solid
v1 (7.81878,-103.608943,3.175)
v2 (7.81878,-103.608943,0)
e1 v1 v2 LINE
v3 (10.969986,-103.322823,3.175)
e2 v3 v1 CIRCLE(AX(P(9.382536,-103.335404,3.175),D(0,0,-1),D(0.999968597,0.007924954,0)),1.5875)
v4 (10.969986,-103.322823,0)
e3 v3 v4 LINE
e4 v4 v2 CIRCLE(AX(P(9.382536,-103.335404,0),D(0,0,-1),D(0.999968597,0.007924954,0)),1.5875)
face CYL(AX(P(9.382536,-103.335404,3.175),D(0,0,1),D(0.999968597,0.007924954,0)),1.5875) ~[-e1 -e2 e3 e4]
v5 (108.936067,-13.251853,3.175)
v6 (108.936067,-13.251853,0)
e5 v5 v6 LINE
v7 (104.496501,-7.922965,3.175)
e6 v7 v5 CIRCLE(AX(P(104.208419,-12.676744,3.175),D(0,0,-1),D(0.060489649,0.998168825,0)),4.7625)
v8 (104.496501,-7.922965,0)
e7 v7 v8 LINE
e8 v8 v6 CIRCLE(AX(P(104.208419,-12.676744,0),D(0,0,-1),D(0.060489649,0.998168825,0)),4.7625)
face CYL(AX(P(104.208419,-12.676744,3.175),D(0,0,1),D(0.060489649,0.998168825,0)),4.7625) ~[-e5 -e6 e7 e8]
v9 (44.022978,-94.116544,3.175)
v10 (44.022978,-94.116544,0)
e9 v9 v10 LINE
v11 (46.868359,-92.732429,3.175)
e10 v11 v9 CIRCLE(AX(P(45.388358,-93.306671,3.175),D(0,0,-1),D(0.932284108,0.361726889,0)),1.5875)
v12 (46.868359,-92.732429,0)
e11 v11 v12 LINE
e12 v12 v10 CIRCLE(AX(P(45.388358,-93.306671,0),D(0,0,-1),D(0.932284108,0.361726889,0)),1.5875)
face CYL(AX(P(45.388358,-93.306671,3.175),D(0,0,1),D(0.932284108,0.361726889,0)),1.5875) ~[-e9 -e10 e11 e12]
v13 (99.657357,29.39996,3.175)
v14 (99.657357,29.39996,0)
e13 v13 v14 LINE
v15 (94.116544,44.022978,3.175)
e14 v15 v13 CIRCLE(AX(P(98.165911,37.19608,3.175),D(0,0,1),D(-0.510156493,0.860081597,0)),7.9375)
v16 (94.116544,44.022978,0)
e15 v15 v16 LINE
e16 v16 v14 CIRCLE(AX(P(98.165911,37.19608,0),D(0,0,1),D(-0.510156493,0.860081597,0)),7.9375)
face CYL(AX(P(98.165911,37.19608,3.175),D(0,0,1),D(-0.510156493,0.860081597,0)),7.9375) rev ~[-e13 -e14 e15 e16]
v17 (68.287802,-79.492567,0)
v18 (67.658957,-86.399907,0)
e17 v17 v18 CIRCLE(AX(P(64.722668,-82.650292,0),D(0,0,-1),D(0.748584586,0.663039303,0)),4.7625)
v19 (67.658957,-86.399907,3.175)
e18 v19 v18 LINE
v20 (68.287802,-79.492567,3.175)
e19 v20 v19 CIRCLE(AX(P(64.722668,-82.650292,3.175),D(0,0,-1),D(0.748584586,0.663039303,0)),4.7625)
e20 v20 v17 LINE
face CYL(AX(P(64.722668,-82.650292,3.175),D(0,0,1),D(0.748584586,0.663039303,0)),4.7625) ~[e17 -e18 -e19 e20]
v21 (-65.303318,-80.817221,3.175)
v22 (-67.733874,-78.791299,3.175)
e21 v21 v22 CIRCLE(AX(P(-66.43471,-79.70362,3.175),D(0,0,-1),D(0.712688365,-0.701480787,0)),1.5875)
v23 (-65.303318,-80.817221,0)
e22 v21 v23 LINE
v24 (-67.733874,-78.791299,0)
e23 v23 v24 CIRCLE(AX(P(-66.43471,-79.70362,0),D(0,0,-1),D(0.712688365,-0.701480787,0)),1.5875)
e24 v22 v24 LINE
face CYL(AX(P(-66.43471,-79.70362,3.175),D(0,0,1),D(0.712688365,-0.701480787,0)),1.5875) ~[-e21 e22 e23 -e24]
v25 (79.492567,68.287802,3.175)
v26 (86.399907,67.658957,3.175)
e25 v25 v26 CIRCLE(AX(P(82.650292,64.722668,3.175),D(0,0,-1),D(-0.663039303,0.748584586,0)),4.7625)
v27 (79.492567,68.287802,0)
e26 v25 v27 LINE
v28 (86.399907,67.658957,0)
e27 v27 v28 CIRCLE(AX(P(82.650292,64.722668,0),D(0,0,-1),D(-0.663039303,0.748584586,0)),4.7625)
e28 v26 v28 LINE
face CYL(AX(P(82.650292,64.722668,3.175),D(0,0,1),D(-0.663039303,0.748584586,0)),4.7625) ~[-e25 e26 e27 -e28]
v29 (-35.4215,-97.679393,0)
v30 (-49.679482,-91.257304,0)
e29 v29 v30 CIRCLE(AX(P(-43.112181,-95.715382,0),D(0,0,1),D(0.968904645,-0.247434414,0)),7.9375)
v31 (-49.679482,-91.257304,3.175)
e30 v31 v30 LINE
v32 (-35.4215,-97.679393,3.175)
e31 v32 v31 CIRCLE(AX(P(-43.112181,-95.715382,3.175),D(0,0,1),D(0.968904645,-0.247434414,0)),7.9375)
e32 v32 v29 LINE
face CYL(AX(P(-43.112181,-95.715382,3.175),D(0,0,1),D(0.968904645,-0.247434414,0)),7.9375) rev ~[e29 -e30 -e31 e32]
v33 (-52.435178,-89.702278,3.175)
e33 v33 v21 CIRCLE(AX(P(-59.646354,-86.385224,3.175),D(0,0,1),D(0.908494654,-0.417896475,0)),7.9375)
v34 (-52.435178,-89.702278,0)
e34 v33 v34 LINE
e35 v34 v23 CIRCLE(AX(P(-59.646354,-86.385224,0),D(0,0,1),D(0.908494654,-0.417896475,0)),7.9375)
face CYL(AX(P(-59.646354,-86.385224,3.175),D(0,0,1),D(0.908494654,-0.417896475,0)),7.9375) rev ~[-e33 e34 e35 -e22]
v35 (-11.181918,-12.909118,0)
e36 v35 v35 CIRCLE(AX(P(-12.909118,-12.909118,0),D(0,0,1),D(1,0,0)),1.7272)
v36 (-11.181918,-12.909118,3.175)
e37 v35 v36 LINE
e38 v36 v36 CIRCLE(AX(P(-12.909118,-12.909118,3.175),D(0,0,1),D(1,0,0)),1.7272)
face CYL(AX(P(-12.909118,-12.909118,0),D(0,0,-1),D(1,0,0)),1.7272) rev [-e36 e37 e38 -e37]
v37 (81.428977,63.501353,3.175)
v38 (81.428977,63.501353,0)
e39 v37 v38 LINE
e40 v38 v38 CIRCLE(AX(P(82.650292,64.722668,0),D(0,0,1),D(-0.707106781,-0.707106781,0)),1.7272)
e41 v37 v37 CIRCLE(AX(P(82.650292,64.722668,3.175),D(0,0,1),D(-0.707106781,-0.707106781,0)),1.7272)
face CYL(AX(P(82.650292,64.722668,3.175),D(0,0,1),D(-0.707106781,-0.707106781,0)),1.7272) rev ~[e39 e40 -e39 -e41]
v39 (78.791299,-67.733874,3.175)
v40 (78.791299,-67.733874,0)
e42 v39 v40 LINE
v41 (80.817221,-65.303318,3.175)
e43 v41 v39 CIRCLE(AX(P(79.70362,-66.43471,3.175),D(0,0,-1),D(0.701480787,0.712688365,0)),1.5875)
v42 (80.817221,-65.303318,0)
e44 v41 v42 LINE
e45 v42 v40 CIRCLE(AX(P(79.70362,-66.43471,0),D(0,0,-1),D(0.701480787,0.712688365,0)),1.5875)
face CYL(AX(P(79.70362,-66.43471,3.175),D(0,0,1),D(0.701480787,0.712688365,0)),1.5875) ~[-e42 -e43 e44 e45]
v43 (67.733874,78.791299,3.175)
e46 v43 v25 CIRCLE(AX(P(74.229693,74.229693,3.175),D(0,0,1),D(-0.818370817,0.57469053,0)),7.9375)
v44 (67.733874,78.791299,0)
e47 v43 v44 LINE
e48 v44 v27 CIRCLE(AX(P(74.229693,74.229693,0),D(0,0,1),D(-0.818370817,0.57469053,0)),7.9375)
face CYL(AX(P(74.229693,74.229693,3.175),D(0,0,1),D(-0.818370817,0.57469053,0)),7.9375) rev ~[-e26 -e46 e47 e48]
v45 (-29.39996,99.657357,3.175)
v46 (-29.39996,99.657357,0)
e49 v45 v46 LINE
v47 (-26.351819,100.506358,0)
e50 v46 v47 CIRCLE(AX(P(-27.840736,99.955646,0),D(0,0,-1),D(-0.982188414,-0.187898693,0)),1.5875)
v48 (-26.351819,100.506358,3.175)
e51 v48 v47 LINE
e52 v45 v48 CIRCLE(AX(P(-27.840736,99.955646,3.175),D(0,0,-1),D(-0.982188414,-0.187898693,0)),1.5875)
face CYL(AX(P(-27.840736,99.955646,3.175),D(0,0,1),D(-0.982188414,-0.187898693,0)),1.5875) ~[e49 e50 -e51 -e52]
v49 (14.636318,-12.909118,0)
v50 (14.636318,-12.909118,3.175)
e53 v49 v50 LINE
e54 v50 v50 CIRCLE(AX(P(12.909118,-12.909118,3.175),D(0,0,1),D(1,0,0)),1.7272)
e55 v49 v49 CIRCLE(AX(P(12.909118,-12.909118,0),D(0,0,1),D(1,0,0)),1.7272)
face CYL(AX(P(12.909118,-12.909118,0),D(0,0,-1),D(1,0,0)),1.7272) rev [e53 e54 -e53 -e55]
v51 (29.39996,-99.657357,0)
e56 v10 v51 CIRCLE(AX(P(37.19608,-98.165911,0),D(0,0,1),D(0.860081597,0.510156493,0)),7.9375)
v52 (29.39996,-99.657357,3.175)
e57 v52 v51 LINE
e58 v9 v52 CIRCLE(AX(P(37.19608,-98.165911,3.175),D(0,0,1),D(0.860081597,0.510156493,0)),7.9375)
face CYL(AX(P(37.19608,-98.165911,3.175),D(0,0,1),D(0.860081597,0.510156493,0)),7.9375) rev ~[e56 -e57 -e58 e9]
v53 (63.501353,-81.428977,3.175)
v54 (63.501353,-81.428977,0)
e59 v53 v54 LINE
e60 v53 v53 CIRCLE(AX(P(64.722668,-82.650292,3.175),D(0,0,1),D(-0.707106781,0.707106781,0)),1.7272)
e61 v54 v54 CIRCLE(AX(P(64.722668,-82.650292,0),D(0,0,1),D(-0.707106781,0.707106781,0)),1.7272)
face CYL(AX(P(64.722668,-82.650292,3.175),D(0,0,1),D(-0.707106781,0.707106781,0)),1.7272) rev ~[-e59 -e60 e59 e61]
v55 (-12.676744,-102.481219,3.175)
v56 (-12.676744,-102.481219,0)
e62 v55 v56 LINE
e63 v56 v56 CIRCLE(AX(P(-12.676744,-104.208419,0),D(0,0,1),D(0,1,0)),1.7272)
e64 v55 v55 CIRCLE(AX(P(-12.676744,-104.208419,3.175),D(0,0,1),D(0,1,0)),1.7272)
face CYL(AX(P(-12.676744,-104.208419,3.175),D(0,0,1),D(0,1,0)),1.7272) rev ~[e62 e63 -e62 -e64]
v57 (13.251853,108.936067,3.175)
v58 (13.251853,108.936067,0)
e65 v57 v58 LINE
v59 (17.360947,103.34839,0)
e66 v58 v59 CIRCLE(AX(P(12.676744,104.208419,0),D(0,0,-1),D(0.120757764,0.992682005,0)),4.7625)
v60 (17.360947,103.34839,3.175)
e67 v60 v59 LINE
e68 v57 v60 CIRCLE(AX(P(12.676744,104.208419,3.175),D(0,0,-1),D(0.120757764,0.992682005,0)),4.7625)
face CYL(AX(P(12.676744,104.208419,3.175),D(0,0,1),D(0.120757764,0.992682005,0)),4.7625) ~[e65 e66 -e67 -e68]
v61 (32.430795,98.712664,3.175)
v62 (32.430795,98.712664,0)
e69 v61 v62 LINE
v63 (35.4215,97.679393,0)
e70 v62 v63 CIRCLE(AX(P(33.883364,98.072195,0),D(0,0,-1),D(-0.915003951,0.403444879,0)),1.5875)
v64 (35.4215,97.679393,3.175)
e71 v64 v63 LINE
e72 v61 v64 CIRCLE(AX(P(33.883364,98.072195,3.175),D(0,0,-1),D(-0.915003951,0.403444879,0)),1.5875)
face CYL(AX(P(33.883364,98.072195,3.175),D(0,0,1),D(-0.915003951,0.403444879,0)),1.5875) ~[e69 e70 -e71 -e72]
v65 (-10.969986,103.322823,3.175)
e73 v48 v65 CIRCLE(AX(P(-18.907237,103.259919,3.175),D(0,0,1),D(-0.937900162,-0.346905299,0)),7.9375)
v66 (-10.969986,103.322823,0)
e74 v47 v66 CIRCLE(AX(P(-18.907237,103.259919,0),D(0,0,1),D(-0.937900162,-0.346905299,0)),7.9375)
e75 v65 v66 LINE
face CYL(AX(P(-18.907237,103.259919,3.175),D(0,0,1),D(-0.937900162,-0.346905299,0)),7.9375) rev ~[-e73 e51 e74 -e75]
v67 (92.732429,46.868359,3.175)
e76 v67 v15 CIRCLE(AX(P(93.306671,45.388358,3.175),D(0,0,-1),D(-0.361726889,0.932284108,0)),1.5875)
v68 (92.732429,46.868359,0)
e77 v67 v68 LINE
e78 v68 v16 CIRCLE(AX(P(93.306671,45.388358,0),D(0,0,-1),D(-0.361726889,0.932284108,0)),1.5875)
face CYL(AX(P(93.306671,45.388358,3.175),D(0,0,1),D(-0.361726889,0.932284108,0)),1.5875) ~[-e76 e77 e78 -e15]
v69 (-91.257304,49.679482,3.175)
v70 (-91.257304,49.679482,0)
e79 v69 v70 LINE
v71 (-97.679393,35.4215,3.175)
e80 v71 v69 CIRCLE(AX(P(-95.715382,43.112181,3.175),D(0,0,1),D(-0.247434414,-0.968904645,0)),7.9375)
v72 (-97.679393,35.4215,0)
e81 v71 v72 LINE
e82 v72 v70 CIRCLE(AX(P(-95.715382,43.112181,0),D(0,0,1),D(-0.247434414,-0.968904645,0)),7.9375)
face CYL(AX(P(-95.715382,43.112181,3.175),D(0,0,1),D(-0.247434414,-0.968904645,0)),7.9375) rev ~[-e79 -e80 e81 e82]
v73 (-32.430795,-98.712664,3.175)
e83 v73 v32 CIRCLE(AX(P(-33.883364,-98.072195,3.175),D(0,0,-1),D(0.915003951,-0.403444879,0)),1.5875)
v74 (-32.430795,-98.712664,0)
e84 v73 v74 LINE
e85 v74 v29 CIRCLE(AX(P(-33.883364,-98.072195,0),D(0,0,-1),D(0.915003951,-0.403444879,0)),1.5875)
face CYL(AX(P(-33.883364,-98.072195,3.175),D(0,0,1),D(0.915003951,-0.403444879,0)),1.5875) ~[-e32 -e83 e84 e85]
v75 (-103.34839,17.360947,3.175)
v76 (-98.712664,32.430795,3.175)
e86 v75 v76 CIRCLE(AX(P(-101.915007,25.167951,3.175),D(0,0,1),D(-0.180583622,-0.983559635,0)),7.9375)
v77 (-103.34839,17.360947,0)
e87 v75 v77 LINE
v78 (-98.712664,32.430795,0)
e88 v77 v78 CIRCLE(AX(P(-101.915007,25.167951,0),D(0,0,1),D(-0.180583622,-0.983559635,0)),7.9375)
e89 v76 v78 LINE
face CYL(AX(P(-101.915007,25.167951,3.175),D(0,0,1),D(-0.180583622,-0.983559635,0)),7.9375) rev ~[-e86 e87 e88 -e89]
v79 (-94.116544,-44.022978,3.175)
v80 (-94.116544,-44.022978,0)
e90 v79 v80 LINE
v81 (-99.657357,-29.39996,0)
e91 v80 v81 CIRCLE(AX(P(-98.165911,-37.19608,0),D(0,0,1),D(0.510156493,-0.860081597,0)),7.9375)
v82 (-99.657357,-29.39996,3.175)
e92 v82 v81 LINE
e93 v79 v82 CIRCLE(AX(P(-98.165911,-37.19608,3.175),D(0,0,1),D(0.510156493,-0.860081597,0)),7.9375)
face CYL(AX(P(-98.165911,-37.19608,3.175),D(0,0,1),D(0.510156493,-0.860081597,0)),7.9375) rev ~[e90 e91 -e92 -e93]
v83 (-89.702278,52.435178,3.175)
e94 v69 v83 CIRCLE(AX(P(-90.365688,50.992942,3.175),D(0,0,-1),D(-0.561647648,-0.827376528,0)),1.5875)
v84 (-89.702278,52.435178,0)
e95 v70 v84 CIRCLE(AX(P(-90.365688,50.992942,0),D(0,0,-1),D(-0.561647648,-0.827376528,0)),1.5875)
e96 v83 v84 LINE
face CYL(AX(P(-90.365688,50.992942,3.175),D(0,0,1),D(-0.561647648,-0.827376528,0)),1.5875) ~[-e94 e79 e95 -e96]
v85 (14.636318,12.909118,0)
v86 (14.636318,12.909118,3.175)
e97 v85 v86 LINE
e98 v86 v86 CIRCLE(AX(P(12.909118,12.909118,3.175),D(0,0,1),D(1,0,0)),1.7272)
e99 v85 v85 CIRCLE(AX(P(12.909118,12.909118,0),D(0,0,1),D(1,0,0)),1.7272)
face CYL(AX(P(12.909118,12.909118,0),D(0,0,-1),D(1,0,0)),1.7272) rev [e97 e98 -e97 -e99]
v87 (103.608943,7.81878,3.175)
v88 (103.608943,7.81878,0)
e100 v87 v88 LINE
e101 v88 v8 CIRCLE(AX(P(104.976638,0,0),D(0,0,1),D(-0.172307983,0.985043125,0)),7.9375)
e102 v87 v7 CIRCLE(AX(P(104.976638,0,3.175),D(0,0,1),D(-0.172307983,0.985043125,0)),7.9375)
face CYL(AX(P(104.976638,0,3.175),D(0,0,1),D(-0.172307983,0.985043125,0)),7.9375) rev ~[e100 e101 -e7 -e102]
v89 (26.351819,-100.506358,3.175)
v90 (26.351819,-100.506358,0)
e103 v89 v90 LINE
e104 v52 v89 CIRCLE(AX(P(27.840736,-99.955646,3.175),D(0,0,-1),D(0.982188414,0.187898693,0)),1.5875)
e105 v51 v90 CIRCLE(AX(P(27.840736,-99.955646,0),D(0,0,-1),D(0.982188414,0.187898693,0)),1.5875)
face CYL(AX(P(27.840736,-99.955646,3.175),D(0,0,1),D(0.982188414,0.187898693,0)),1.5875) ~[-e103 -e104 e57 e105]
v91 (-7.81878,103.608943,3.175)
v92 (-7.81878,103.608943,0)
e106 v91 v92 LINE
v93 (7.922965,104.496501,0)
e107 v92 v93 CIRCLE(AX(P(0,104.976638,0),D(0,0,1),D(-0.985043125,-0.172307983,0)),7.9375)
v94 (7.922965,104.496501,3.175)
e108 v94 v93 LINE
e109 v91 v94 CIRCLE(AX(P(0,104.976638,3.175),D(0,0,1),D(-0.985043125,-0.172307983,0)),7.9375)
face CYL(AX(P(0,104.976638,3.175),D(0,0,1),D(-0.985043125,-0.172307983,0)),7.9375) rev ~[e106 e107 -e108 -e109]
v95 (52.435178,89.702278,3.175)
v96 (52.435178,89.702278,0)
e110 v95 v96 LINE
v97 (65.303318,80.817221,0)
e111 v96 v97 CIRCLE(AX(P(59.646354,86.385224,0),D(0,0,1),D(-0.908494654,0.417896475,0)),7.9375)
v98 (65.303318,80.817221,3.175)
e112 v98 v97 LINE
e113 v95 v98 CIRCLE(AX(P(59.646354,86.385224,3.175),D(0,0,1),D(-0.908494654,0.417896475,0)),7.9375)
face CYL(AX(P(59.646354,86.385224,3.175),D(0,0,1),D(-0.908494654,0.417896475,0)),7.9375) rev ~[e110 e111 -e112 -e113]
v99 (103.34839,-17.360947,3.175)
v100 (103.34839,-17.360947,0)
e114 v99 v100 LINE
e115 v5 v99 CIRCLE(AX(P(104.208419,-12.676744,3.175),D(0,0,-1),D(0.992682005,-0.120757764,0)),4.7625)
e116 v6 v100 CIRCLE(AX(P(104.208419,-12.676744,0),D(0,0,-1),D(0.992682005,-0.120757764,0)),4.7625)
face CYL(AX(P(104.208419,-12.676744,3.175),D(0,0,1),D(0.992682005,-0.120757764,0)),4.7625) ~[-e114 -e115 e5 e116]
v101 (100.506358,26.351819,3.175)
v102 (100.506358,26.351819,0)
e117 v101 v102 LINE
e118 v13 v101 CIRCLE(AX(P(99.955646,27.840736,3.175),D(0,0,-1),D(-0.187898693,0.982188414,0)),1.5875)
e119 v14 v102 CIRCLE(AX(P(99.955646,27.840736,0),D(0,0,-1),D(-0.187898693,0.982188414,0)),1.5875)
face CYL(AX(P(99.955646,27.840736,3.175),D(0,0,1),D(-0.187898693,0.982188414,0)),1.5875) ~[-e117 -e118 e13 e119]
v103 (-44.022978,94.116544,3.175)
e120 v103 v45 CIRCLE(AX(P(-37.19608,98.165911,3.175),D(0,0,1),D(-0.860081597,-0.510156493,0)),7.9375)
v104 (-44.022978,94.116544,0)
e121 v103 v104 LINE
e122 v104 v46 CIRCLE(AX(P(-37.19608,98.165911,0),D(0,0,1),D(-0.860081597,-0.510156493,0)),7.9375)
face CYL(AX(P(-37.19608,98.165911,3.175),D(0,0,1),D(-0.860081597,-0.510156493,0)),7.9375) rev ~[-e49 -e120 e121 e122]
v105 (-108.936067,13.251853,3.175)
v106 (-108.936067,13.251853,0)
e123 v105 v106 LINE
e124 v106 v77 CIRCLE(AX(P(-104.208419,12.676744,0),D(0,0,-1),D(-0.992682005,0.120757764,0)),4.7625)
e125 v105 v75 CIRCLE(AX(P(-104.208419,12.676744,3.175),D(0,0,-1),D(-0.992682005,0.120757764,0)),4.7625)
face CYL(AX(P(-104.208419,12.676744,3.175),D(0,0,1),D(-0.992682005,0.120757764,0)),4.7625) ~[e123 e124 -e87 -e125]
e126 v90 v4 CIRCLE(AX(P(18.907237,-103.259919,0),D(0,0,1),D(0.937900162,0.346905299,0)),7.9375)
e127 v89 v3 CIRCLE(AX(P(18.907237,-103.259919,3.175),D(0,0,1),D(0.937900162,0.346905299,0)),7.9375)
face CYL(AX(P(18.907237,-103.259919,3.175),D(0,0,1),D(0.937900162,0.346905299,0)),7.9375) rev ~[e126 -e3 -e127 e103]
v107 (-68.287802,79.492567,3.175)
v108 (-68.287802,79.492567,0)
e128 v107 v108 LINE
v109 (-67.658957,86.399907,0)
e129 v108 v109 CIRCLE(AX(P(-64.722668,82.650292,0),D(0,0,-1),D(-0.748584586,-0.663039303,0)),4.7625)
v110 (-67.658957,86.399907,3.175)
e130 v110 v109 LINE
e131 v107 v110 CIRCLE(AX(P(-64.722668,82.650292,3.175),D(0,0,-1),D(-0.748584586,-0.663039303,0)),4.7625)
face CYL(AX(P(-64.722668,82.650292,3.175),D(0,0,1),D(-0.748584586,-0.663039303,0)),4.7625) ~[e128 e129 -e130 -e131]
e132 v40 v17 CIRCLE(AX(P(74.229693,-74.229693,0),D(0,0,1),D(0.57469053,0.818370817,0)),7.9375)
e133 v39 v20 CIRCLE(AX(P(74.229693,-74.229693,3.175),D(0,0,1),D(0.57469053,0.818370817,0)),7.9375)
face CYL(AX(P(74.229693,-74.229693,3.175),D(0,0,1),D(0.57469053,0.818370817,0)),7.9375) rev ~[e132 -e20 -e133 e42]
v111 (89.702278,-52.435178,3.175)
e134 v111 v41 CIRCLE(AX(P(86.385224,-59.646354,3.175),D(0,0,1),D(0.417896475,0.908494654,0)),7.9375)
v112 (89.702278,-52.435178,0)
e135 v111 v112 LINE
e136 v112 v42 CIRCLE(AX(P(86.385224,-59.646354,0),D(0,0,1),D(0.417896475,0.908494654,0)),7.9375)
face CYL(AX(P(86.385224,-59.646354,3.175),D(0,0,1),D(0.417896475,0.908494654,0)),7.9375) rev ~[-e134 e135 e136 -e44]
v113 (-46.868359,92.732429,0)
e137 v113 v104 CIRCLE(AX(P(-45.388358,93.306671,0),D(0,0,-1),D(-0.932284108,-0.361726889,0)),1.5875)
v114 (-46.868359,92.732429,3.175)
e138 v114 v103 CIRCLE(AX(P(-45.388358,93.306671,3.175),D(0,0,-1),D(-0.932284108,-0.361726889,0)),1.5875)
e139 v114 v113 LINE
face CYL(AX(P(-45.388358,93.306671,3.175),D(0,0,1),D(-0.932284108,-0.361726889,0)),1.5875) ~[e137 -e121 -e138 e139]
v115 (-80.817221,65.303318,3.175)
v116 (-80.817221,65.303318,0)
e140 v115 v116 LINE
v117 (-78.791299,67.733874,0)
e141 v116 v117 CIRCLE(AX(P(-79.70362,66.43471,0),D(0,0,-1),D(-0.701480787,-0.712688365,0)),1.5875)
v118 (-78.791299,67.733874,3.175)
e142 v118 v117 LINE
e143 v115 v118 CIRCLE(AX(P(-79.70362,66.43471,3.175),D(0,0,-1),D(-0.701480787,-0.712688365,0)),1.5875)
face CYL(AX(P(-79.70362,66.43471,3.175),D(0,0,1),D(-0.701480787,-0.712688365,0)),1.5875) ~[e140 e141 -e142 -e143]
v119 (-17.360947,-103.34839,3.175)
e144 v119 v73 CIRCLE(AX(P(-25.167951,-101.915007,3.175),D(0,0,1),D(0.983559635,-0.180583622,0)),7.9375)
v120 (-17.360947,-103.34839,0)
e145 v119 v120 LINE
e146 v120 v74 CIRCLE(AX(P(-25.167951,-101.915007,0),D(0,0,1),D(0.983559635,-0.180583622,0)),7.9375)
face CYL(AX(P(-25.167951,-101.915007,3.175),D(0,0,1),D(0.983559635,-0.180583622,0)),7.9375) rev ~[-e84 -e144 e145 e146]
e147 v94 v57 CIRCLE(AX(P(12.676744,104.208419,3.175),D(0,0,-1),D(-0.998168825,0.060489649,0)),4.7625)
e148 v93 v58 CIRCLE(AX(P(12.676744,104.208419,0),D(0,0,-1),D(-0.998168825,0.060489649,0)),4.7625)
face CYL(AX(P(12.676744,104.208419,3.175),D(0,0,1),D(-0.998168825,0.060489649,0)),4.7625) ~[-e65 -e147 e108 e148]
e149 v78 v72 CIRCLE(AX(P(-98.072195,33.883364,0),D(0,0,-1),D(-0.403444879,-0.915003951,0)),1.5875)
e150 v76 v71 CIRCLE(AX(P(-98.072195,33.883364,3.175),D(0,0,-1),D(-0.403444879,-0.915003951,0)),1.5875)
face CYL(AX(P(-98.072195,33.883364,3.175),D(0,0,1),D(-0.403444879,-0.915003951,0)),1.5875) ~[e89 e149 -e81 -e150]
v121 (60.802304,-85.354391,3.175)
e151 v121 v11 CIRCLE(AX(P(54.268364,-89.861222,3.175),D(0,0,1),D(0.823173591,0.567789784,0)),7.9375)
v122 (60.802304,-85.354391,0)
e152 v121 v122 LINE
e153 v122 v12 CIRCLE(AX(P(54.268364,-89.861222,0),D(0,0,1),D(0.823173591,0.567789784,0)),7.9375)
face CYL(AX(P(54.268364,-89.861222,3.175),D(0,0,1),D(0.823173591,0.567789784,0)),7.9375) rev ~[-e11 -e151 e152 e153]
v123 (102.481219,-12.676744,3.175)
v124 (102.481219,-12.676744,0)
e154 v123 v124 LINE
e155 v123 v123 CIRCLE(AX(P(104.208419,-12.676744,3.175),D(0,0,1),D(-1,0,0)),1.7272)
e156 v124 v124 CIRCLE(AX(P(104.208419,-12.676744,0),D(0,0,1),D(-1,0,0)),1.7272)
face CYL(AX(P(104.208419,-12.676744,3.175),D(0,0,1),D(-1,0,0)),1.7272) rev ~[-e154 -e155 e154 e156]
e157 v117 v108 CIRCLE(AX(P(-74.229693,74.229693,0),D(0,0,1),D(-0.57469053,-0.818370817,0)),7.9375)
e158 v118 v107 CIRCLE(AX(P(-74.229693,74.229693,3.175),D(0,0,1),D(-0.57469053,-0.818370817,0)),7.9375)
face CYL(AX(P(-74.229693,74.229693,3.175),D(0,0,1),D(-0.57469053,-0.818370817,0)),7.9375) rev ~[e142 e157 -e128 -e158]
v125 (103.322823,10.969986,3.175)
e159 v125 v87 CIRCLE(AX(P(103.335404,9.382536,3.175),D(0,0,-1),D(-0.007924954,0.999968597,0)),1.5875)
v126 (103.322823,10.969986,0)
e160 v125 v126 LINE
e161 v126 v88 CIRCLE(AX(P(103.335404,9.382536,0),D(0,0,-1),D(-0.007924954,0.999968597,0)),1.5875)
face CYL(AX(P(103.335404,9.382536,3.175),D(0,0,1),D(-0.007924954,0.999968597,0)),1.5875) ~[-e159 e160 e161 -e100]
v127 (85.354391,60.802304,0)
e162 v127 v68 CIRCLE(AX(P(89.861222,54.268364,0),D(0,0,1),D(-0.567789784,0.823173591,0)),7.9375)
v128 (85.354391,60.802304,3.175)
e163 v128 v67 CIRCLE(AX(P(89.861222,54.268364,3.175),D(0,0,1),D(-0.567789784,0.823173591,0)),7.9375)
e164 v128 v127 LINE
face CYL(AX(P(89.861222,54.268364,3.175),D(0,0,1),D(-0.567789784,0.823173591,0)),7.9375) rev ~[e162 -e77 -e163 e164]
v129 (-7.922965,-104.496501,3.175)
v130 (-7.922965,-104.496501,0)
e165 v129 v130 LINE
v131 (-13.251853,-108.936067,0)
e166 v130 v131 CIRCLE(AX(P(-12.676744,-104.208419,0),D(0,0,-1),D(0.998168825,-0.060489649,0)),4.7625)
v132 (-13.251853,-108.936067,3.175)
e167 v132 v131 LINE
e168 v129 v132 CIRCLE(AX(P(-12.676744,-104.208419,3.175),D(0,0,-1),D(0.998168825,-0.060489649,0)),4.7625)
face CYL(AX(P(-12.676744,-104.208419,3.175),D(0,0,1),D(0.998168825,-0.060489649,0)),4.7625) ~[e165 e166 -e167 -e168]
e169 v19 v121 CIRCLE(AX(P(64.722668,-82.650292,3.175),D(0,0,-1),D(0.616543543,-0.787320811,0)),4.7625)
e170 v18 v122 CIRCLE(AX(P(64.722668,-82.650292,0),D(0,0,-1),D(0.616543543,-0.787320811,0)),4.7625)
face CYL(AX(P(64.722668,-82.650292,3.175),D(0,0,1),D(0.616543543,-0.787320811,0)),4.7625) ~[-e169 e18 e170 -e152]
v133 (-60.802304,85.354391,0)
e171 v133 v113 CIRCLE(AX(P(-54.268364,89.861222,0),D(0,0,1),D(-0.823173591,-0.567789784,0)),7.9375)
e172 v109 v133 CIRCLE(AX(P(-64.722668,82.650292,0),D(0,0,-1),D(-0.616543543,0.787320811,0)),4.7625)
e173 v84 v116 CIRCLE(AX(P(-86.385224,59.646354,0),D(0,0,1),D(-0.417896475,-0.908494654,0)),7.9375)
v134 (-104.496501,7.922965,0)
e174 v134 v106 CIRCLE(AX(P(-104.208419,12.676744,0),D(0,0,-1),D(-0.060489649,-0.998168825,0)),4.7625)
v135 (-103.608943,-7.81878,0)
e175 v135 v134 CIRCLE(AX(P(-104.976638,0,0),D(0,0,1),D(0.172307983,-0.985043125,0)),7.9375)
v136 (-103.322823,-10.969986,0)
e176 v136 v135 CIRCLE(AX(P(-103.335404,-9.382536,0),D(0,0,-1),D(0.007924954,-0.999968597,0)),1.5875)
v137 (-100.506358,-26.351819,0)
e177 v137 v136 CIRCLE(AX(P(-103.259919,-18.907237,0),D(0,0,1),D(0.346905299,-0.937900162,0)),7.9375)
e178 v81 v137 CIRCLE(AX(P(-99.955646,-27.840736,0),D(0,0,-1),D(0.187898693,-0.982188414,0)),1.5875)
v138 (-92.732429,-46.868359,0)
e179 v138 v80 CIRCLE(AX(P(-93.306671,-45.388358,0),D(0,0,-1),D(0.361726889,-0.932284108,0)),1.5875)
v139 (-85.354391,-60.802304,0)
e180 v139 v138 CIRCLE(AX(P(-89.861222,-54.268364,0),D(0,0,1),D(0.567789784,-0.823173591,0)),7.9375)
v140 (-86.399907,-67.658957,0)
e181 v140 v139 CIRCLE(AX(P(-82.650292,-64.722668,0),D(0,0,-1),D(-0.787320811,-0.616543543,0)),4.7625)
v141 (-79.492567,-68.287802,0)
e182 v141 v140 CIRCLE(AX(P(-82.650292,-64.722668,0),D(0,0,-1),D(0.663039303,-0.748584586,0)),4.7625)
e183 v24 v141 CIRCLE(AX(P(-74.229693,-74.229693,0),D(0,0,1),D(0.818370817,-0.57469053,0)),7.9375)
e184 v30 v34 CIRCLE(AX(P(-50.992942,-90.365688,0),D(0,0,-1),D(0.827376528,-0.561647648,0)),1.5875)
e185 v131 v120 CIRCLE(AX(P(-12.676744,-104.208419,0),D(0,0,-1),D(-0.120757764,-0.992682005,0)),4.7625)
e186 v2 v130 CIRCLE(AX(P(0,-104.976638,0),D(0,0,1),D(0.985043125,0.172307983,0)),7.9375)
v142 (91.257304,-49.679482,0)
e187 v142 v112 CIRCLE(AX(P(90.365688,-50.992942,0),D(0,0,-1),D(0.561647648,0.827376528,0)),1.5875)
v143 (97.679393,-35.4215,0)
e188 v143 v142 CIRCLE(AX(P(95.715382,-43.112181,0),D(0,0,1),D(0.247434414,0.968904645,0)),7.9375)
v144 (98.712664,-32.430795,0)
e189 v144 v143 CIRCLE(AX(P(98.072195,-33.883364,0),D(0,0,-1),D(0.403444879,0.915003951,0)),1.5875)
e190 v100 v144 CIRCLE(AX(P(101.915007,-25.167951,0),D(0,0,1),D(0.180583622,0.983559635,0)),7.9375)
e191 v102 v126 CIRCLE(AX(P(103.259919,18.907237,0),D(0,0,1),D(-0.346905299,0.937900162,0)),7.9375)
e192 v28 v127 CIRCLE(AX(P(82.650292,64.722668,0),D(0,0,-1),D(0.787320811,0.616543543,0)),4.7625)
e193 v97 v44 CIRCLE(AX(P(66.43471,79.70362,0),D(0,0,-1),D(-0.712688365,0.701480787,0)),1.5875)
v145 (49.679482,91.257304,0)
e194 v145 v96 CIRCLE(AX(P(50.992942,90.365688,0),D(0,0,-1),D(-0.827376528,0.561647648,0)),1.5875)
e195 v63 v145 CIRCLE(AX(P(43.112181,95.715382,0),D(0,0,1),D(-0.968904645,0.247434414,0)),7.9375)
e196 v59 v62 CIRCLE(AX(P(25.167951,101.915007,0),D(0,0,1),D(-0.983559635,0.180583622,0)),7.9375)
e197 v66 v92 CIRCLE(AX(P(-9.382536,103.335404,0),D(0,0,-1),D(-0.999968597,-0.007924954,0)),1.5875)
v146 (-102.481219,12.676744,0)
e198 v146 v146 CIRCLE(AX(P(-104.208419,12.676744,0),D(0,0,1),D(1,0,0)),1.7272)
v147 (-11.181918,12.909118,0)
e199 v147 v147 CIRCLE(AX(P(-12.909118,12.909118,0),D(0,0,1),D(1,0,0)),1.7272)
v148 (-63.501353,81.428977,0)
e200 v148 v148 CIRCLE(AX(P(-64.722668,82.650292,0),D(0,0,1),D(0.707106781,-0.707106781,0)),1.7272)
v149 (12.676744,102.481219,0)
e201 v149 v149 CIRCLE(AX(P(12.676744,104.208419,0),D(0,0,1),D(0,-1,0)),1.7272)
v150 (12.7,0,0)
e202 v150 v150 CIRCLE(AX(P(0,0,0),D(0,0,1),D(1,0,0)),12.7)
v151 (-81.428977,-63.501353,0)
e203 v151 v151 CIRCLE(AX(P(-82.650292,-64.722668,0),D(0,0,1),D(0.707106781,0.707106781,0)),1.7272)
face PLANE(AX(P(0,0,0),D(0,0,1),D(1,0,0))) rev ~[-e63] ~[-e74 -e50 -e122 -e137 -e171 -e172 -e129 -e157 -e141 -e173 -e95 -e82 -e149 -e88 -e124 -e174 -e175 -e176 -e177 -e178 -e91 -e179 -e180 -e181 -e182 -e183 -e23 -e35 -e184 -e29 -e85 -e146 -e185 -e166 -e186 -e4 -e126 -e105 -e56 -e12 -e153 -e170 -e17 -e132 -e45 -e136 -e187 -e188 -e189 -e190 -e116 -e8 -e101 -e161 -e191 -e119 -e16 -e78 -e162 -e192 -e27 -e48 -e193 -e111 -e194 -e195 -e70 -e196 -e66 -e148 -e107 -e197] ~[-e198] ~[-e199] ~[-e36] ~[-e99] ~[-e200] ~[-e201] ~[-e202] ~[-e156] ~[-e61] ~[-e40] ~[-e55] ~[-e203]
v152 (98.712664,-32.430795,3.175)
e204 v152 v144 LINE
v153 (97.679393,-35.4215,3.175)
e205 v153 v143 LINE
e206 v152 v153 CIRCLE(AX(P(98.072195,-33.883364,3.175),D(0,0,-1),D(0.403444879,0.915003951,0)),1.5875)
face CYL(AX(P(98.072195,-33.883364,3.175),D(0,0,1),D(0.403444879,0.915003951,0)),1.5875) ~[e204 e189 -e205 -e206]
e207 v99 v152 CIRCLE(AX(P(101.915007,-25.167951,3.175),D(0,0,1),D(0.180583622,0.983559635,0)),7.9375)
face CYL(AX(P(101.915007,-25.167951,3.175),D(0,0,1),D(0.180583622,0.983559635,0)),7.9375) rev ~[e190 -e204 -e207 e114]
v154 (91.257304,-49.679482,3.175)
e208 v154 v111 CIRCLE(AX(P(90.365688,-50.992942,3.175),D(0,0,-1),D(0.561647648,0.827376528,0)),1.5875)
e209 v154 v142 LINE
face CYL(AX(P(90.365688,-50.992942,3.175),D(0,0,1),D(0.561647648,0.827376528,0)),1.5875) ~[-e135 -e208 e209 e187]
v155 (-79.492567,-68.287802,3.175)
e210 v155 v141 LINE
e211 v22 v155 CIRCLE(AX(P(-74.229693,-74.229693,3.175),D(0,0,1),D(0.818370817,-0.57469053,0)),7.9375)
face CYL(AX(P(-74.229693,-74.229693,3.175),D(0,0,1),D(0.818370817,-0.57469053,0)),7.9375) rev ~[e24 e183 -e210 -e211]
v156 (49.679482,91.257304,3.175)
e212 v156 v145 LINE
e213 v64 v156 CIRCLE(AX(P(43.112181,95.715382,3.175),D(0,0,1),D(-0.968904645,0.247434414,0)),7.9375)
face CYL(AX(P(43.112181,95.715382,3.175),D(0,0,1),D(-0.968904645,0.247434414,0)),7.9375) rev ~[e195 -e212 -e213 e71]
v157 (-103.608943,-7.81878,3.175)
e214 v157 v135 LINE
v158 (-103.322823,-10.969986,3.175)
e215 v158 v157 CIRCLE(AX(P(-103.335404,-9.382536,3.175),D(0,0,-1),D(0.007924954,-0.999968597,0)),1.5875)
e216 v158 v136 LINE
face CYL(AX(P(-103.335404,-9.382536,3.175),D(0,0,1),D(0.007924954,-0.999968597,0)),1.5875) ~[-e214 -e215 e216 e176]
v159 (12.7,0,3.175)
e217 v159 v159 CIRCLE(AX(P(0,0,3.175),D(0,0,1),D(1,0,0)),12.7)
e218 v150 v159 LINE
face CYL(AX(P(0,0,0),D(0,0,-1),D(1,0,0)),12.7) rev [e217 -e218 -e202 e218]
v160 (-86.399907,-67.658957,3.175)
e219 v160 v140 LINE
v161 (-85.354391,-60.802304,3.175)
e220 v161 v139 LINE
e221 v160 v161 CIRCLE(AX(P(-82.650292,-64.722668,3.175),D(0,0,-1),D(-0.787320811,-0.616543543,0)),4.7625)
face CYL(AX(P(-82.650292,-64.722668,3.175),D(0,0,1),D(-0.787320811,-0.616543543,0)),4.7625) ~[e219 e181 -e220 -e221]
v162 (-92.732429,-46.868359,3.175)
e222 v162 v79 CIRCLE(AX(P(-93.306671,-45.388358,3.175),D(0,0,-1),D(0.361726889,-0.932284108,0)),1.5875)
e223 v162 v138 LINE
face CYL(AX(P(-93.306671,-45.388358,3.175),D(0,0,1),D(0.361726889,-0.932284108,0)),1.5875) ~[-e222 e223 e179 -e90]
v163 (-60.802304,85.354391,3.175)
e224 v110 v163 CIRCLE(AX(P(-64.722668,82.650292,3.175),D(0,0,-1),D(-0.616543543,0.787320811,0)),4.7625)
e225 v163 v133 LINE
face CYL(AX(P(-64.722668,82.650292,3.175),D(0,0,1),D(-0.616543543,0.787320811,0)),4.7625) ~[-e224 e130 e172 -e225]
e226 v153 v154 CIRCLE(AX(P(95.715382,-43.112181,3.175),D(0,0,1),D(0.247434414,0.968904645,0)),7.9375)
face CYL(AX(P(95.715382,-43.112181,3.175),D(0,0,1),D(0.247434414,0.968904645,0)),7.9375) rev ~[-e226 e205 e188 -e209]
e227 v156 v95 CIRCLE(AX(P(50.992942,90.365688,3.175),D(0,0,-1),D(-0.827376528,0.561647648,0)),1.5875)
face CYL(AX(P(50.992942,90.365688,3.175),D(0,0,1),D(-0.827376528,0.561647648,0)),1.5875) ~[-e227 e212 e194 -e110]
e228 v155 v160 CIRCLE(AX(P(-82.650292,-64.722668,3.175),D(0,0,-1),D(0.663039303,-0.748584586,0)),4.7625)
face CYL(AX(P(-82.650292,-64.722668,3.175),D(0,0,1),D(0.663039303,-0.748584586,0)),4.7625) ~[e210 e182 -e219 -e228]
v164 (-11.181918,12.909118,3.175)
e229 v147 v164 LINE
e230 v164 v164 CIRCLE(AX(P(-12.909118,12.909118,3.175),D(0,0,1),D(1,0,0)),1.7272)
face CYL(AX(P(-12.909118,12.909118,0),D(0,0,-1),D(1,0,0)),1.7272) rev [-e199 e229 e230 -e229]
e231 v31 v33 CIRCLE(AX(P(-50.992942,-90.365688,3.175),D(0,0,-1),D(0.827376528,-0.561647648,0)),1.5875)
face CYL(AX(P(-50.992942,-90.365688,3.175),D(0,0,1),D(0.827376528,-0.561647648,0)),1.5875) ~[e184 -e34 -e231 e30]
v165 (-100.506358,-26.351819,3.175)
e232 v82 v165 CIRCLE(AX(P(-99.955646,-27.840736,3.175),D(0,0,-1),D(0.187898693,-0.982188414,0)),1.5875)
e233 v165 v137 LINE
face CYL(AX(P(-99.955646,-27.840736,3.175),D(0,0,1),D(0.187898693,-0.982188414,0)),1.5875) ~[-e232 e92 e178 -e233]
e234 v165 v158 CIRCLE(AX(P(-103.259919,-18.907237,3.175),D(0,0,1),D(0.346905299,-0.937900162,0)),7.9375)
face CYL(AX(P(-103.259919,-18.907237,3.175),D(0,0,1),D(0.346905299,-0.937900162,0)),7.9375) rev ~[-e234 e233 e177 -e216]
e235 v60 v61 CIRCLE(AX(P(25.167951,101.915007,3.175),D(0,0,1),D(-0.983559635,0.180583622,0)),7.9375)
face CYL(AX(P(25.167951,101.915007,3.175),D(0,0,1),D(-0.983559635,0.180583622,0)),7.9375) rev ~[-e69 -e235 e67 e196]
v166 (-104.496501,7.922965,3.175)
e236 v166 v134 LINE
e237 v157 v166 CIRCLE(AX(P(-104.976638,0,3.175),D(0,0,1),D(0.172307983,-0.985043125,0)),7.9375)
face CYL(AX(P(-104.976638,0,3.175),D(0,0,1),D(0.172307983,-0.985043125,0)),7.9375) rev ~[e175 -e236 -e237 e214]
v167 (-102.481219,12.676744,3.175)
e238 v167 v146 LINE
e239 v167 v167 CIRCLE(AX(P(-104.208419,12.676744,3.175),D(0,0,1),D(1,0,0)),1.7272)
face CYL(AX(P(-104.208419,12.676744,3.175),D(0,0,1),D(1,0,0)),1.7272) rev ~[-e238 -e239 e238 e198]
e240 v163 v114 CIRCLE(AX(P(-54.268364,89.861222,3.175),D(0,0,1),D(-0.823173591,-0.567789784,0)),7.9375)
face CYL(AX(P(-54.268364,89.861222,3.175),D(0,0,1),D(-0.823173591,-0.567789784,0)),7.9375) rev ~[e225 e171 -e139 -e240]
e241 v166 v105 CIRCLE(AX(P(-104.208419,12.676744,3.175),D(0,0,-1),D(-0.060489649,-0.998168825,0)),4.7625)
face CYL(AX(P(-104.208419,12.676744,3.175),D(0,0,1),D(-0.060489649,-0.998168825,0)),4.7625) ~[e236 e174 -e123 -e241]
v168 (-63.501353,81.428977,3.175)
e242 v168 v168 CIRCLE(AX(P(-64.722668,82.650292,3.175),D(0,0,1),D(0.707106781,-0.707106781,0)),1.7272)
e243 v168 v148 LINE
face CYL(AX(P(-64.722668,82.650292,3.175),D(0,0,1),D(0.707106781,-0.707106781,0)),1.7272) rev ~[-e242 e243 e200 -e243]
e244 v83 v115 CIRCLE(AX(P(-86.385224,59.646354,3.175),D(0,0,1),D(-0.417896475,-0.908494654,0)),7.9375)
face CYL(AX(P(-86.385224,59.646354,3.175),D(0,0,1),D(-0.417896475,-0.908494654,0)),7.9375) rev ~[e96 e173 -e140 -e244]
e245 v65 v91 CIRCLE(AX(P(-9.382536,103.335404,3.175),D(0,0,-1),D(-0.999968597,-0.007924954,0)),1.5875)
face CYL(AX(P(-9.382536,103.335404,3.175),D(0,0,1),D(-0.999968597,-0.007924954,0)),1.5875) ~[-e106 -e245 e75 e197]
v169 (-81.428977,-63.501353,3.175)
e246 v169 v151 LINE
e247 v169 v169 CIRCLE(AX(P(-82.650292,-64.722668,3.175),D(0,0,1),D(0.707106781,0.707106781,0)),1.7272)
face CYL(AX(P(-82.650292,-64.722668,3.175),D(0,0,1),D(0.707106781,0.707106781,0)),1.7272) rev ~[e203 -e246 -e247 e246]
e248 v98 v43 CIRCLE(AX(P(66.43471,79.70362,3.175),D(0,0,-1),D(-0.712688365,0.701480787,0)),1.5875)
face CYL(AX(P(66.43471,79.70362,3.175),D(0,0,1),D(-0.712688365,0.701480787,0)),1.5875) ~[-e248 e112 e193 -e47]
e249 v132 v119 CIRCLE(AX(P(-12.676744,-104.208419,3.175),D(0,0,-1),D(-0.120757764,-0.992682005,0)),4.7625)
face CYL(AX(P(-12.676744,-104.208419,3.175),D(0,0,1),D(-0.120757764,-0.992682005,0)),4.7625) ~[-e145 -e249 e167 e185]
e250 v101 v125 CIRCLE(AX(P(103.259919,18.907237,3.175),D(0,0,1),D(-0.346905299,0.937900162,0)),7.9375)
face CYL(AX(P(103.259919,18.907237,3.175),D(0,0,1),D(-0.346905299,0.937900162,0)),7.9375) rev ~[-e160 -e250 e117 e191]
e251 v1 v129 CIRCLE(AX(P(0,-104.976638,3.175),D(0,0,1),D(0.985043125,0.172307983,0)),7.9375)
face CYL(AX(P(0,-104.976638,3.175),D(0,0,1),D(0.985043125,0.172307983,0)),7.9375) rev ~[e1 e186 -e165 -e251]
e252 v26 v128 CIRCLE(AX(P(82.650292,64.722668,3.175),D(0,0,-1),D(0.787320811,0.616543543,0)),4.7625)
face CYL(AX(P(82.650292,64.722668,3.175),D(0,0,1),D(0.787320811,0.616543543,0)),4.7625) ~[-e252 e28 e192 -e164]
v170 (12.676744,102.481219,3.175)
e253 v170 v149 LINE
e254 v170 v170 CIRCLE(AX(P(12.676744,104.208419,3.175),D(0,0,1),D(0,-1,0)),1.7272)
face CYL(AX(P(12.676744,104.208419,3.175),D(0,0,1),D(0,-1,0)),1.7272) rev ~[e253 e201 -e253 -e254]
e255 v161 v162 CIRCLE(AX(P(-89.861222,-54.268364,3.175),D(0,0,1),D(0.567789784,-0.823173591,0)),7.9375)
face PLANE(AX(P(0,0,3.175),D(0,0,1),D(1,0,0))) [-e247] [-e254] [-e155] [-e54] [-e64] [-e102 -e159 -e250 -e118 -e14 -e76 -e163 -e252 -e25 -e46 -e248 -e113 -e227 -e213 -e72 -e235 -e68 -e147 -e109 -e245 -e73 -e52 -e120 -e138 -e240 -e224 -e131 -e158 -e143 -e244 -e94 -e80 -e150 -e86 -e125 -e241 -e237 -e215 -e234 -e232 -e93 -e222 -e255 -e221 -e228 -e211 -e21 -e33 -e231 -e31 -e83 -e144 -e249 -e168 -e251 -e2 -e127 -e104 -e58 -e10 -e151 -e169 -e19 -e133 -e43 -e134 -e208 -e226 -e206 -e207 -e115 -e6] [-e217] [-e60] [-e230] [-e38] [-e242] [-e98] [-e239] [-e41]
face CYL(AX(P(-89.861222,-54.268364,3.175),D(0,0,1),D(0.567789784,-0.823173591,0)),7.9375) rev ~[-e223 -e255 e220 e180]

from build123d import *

# Parameters (mm, degrees)
F0_R            = 114.3
F0_R_2          = 1.7272
F0_R_3          = 12.7
F1_DEPTH        = 3.175
F2_R            = 1.7272
F3_DEPTH        = 3.175
F3_COPIES_COUNT = 8
F5_DEPTH        = 3.175
F5_COPIES_COUNT = 8


# Not quite as in the source:
# - a pattern or mirror of a feature is missing from the dataset's text; its kind, count and spacing are read off the source's solid


with BuildPart() as f1:
    # F0 (on Top) → F1 (new body)
    with BuildSketch(Plane.XY):
        Circle(F0_R)
        with Locations((-12.909118174, -12.909118174)):
            Circle(F0_R_2, mode=Mode.SUBTRACT)
        with Locations((12.909118174, -12.909118174)):
            Circle(F0_R_2, mode=Mode.SUBTRACT)
        with Locations((-12.909118174, 12.909118174)):
            Circle(F0_R_2, mode=Mode.SUBTRACT)
        Circle(F0_R_3, mode=Mode.SUBTRACT)
        with Locations((12.909118174, 12.909118174)):
            Circle(F0_R_2, mode=Mode.SUBTRACT)
    extrude(amount=F1_DEPTH)

    # F2 (on face) → F3 (cut, through all)
    with BuildSketch(Plane.XY.offset(3.175)):
        with Locations((-104.2084193553, 12.676744072)):
            Circle(F2_R)
    f3 = extrude(amount=-F3_DEPTH, mode=Mode.SUBTRACT)

    # F3_copies: F3 ×8 about axis
    f3_copies_axis = Axis((0, 0, 0), (0, 0, 1))
    for i in range(1, F3_COPIES_COUNT):
        add(f3.rotate(f3_copies_axis, i * 360 / F3_COPIES_COUNT), mode=Mode.SUBTRACT)

    # F4 (on face) → F5 (cut, through all)
    with BuildSketch(Plane.XY.offset(3.175)):
        with BuildLine():
            ThreePointArc((-86.3999070415, -67.6589569107), (-87.3583729083, -64.0047703869), (-85.3543905267, -60.8023040588))
            ThreePointArc((-85.3543905267, -60.8023040588), (-82.8464143249, -50.5540157704), (-92.7324291182, -46.8683585731))
            ThreePointArc((-92.7324291182, -46.8683585731), (-94.7342307933, -46.0827839435), (-94.1165439867, -44.0229780172))
            ThreePointArc((-94.1165439867, -44.0229780172), (-90.7433842392, -34.3836080304), (-99.6573570235, -29.3999598059))
            ThreePointArc((-99.6573570235, -29.3999598059), (-101.4849334974, -28.2666894598), (-100.5063583602, -26.3518191911))
            ThreePointArc((-100.5063583602, -26.3518191911), (-95.4522238114, -17.4776215154), (-103.3228234926, -10.9699859169))
            ThreePointArc((-103.3228234926, -10.9699859169), (-104.9164008036, -9.5260853666), (-103.6089432811, -7.8187798076))
            ThreePointArc((-103.6089432811, -7.8187798076), (-97.0517244749, 0.4468259777), (-104.4965013095, 7.922965045))
            ThreePointArc((-104.4965013095, 7.922965045), (-107.8674695554, 9.6283415588), (-108.9360674025, 13.2518529234))
            Line((-108.9360674025, 13.2518529234), (-113.463553135, 13.8026124328))
            ThreePointArc((-113.463553135, 13.8026124328), (-110.1086855289, -30.6686708402), (-89.9907686886, -70.47092699))
            Line((-89.9907686886, -70.47092699), (-86.3999070415, -67.6589569107))
        make_face()
    f5 = extrude(amount=-F5_DEPTH, mode=Mode.SUBTRACT)

    # F5_copies: F5 ×8 about axis
    f5_copies_axis = Axis((0, 0, 0), (0, 0, 1))
    for i in range(1, F5_COPIES_COUNT):
        add(f5.rotate(f5_copies_axis, i * 360 / F5_COPIES_COUNT), mode=Mode.SUBTRACT)


solid = f1.part
